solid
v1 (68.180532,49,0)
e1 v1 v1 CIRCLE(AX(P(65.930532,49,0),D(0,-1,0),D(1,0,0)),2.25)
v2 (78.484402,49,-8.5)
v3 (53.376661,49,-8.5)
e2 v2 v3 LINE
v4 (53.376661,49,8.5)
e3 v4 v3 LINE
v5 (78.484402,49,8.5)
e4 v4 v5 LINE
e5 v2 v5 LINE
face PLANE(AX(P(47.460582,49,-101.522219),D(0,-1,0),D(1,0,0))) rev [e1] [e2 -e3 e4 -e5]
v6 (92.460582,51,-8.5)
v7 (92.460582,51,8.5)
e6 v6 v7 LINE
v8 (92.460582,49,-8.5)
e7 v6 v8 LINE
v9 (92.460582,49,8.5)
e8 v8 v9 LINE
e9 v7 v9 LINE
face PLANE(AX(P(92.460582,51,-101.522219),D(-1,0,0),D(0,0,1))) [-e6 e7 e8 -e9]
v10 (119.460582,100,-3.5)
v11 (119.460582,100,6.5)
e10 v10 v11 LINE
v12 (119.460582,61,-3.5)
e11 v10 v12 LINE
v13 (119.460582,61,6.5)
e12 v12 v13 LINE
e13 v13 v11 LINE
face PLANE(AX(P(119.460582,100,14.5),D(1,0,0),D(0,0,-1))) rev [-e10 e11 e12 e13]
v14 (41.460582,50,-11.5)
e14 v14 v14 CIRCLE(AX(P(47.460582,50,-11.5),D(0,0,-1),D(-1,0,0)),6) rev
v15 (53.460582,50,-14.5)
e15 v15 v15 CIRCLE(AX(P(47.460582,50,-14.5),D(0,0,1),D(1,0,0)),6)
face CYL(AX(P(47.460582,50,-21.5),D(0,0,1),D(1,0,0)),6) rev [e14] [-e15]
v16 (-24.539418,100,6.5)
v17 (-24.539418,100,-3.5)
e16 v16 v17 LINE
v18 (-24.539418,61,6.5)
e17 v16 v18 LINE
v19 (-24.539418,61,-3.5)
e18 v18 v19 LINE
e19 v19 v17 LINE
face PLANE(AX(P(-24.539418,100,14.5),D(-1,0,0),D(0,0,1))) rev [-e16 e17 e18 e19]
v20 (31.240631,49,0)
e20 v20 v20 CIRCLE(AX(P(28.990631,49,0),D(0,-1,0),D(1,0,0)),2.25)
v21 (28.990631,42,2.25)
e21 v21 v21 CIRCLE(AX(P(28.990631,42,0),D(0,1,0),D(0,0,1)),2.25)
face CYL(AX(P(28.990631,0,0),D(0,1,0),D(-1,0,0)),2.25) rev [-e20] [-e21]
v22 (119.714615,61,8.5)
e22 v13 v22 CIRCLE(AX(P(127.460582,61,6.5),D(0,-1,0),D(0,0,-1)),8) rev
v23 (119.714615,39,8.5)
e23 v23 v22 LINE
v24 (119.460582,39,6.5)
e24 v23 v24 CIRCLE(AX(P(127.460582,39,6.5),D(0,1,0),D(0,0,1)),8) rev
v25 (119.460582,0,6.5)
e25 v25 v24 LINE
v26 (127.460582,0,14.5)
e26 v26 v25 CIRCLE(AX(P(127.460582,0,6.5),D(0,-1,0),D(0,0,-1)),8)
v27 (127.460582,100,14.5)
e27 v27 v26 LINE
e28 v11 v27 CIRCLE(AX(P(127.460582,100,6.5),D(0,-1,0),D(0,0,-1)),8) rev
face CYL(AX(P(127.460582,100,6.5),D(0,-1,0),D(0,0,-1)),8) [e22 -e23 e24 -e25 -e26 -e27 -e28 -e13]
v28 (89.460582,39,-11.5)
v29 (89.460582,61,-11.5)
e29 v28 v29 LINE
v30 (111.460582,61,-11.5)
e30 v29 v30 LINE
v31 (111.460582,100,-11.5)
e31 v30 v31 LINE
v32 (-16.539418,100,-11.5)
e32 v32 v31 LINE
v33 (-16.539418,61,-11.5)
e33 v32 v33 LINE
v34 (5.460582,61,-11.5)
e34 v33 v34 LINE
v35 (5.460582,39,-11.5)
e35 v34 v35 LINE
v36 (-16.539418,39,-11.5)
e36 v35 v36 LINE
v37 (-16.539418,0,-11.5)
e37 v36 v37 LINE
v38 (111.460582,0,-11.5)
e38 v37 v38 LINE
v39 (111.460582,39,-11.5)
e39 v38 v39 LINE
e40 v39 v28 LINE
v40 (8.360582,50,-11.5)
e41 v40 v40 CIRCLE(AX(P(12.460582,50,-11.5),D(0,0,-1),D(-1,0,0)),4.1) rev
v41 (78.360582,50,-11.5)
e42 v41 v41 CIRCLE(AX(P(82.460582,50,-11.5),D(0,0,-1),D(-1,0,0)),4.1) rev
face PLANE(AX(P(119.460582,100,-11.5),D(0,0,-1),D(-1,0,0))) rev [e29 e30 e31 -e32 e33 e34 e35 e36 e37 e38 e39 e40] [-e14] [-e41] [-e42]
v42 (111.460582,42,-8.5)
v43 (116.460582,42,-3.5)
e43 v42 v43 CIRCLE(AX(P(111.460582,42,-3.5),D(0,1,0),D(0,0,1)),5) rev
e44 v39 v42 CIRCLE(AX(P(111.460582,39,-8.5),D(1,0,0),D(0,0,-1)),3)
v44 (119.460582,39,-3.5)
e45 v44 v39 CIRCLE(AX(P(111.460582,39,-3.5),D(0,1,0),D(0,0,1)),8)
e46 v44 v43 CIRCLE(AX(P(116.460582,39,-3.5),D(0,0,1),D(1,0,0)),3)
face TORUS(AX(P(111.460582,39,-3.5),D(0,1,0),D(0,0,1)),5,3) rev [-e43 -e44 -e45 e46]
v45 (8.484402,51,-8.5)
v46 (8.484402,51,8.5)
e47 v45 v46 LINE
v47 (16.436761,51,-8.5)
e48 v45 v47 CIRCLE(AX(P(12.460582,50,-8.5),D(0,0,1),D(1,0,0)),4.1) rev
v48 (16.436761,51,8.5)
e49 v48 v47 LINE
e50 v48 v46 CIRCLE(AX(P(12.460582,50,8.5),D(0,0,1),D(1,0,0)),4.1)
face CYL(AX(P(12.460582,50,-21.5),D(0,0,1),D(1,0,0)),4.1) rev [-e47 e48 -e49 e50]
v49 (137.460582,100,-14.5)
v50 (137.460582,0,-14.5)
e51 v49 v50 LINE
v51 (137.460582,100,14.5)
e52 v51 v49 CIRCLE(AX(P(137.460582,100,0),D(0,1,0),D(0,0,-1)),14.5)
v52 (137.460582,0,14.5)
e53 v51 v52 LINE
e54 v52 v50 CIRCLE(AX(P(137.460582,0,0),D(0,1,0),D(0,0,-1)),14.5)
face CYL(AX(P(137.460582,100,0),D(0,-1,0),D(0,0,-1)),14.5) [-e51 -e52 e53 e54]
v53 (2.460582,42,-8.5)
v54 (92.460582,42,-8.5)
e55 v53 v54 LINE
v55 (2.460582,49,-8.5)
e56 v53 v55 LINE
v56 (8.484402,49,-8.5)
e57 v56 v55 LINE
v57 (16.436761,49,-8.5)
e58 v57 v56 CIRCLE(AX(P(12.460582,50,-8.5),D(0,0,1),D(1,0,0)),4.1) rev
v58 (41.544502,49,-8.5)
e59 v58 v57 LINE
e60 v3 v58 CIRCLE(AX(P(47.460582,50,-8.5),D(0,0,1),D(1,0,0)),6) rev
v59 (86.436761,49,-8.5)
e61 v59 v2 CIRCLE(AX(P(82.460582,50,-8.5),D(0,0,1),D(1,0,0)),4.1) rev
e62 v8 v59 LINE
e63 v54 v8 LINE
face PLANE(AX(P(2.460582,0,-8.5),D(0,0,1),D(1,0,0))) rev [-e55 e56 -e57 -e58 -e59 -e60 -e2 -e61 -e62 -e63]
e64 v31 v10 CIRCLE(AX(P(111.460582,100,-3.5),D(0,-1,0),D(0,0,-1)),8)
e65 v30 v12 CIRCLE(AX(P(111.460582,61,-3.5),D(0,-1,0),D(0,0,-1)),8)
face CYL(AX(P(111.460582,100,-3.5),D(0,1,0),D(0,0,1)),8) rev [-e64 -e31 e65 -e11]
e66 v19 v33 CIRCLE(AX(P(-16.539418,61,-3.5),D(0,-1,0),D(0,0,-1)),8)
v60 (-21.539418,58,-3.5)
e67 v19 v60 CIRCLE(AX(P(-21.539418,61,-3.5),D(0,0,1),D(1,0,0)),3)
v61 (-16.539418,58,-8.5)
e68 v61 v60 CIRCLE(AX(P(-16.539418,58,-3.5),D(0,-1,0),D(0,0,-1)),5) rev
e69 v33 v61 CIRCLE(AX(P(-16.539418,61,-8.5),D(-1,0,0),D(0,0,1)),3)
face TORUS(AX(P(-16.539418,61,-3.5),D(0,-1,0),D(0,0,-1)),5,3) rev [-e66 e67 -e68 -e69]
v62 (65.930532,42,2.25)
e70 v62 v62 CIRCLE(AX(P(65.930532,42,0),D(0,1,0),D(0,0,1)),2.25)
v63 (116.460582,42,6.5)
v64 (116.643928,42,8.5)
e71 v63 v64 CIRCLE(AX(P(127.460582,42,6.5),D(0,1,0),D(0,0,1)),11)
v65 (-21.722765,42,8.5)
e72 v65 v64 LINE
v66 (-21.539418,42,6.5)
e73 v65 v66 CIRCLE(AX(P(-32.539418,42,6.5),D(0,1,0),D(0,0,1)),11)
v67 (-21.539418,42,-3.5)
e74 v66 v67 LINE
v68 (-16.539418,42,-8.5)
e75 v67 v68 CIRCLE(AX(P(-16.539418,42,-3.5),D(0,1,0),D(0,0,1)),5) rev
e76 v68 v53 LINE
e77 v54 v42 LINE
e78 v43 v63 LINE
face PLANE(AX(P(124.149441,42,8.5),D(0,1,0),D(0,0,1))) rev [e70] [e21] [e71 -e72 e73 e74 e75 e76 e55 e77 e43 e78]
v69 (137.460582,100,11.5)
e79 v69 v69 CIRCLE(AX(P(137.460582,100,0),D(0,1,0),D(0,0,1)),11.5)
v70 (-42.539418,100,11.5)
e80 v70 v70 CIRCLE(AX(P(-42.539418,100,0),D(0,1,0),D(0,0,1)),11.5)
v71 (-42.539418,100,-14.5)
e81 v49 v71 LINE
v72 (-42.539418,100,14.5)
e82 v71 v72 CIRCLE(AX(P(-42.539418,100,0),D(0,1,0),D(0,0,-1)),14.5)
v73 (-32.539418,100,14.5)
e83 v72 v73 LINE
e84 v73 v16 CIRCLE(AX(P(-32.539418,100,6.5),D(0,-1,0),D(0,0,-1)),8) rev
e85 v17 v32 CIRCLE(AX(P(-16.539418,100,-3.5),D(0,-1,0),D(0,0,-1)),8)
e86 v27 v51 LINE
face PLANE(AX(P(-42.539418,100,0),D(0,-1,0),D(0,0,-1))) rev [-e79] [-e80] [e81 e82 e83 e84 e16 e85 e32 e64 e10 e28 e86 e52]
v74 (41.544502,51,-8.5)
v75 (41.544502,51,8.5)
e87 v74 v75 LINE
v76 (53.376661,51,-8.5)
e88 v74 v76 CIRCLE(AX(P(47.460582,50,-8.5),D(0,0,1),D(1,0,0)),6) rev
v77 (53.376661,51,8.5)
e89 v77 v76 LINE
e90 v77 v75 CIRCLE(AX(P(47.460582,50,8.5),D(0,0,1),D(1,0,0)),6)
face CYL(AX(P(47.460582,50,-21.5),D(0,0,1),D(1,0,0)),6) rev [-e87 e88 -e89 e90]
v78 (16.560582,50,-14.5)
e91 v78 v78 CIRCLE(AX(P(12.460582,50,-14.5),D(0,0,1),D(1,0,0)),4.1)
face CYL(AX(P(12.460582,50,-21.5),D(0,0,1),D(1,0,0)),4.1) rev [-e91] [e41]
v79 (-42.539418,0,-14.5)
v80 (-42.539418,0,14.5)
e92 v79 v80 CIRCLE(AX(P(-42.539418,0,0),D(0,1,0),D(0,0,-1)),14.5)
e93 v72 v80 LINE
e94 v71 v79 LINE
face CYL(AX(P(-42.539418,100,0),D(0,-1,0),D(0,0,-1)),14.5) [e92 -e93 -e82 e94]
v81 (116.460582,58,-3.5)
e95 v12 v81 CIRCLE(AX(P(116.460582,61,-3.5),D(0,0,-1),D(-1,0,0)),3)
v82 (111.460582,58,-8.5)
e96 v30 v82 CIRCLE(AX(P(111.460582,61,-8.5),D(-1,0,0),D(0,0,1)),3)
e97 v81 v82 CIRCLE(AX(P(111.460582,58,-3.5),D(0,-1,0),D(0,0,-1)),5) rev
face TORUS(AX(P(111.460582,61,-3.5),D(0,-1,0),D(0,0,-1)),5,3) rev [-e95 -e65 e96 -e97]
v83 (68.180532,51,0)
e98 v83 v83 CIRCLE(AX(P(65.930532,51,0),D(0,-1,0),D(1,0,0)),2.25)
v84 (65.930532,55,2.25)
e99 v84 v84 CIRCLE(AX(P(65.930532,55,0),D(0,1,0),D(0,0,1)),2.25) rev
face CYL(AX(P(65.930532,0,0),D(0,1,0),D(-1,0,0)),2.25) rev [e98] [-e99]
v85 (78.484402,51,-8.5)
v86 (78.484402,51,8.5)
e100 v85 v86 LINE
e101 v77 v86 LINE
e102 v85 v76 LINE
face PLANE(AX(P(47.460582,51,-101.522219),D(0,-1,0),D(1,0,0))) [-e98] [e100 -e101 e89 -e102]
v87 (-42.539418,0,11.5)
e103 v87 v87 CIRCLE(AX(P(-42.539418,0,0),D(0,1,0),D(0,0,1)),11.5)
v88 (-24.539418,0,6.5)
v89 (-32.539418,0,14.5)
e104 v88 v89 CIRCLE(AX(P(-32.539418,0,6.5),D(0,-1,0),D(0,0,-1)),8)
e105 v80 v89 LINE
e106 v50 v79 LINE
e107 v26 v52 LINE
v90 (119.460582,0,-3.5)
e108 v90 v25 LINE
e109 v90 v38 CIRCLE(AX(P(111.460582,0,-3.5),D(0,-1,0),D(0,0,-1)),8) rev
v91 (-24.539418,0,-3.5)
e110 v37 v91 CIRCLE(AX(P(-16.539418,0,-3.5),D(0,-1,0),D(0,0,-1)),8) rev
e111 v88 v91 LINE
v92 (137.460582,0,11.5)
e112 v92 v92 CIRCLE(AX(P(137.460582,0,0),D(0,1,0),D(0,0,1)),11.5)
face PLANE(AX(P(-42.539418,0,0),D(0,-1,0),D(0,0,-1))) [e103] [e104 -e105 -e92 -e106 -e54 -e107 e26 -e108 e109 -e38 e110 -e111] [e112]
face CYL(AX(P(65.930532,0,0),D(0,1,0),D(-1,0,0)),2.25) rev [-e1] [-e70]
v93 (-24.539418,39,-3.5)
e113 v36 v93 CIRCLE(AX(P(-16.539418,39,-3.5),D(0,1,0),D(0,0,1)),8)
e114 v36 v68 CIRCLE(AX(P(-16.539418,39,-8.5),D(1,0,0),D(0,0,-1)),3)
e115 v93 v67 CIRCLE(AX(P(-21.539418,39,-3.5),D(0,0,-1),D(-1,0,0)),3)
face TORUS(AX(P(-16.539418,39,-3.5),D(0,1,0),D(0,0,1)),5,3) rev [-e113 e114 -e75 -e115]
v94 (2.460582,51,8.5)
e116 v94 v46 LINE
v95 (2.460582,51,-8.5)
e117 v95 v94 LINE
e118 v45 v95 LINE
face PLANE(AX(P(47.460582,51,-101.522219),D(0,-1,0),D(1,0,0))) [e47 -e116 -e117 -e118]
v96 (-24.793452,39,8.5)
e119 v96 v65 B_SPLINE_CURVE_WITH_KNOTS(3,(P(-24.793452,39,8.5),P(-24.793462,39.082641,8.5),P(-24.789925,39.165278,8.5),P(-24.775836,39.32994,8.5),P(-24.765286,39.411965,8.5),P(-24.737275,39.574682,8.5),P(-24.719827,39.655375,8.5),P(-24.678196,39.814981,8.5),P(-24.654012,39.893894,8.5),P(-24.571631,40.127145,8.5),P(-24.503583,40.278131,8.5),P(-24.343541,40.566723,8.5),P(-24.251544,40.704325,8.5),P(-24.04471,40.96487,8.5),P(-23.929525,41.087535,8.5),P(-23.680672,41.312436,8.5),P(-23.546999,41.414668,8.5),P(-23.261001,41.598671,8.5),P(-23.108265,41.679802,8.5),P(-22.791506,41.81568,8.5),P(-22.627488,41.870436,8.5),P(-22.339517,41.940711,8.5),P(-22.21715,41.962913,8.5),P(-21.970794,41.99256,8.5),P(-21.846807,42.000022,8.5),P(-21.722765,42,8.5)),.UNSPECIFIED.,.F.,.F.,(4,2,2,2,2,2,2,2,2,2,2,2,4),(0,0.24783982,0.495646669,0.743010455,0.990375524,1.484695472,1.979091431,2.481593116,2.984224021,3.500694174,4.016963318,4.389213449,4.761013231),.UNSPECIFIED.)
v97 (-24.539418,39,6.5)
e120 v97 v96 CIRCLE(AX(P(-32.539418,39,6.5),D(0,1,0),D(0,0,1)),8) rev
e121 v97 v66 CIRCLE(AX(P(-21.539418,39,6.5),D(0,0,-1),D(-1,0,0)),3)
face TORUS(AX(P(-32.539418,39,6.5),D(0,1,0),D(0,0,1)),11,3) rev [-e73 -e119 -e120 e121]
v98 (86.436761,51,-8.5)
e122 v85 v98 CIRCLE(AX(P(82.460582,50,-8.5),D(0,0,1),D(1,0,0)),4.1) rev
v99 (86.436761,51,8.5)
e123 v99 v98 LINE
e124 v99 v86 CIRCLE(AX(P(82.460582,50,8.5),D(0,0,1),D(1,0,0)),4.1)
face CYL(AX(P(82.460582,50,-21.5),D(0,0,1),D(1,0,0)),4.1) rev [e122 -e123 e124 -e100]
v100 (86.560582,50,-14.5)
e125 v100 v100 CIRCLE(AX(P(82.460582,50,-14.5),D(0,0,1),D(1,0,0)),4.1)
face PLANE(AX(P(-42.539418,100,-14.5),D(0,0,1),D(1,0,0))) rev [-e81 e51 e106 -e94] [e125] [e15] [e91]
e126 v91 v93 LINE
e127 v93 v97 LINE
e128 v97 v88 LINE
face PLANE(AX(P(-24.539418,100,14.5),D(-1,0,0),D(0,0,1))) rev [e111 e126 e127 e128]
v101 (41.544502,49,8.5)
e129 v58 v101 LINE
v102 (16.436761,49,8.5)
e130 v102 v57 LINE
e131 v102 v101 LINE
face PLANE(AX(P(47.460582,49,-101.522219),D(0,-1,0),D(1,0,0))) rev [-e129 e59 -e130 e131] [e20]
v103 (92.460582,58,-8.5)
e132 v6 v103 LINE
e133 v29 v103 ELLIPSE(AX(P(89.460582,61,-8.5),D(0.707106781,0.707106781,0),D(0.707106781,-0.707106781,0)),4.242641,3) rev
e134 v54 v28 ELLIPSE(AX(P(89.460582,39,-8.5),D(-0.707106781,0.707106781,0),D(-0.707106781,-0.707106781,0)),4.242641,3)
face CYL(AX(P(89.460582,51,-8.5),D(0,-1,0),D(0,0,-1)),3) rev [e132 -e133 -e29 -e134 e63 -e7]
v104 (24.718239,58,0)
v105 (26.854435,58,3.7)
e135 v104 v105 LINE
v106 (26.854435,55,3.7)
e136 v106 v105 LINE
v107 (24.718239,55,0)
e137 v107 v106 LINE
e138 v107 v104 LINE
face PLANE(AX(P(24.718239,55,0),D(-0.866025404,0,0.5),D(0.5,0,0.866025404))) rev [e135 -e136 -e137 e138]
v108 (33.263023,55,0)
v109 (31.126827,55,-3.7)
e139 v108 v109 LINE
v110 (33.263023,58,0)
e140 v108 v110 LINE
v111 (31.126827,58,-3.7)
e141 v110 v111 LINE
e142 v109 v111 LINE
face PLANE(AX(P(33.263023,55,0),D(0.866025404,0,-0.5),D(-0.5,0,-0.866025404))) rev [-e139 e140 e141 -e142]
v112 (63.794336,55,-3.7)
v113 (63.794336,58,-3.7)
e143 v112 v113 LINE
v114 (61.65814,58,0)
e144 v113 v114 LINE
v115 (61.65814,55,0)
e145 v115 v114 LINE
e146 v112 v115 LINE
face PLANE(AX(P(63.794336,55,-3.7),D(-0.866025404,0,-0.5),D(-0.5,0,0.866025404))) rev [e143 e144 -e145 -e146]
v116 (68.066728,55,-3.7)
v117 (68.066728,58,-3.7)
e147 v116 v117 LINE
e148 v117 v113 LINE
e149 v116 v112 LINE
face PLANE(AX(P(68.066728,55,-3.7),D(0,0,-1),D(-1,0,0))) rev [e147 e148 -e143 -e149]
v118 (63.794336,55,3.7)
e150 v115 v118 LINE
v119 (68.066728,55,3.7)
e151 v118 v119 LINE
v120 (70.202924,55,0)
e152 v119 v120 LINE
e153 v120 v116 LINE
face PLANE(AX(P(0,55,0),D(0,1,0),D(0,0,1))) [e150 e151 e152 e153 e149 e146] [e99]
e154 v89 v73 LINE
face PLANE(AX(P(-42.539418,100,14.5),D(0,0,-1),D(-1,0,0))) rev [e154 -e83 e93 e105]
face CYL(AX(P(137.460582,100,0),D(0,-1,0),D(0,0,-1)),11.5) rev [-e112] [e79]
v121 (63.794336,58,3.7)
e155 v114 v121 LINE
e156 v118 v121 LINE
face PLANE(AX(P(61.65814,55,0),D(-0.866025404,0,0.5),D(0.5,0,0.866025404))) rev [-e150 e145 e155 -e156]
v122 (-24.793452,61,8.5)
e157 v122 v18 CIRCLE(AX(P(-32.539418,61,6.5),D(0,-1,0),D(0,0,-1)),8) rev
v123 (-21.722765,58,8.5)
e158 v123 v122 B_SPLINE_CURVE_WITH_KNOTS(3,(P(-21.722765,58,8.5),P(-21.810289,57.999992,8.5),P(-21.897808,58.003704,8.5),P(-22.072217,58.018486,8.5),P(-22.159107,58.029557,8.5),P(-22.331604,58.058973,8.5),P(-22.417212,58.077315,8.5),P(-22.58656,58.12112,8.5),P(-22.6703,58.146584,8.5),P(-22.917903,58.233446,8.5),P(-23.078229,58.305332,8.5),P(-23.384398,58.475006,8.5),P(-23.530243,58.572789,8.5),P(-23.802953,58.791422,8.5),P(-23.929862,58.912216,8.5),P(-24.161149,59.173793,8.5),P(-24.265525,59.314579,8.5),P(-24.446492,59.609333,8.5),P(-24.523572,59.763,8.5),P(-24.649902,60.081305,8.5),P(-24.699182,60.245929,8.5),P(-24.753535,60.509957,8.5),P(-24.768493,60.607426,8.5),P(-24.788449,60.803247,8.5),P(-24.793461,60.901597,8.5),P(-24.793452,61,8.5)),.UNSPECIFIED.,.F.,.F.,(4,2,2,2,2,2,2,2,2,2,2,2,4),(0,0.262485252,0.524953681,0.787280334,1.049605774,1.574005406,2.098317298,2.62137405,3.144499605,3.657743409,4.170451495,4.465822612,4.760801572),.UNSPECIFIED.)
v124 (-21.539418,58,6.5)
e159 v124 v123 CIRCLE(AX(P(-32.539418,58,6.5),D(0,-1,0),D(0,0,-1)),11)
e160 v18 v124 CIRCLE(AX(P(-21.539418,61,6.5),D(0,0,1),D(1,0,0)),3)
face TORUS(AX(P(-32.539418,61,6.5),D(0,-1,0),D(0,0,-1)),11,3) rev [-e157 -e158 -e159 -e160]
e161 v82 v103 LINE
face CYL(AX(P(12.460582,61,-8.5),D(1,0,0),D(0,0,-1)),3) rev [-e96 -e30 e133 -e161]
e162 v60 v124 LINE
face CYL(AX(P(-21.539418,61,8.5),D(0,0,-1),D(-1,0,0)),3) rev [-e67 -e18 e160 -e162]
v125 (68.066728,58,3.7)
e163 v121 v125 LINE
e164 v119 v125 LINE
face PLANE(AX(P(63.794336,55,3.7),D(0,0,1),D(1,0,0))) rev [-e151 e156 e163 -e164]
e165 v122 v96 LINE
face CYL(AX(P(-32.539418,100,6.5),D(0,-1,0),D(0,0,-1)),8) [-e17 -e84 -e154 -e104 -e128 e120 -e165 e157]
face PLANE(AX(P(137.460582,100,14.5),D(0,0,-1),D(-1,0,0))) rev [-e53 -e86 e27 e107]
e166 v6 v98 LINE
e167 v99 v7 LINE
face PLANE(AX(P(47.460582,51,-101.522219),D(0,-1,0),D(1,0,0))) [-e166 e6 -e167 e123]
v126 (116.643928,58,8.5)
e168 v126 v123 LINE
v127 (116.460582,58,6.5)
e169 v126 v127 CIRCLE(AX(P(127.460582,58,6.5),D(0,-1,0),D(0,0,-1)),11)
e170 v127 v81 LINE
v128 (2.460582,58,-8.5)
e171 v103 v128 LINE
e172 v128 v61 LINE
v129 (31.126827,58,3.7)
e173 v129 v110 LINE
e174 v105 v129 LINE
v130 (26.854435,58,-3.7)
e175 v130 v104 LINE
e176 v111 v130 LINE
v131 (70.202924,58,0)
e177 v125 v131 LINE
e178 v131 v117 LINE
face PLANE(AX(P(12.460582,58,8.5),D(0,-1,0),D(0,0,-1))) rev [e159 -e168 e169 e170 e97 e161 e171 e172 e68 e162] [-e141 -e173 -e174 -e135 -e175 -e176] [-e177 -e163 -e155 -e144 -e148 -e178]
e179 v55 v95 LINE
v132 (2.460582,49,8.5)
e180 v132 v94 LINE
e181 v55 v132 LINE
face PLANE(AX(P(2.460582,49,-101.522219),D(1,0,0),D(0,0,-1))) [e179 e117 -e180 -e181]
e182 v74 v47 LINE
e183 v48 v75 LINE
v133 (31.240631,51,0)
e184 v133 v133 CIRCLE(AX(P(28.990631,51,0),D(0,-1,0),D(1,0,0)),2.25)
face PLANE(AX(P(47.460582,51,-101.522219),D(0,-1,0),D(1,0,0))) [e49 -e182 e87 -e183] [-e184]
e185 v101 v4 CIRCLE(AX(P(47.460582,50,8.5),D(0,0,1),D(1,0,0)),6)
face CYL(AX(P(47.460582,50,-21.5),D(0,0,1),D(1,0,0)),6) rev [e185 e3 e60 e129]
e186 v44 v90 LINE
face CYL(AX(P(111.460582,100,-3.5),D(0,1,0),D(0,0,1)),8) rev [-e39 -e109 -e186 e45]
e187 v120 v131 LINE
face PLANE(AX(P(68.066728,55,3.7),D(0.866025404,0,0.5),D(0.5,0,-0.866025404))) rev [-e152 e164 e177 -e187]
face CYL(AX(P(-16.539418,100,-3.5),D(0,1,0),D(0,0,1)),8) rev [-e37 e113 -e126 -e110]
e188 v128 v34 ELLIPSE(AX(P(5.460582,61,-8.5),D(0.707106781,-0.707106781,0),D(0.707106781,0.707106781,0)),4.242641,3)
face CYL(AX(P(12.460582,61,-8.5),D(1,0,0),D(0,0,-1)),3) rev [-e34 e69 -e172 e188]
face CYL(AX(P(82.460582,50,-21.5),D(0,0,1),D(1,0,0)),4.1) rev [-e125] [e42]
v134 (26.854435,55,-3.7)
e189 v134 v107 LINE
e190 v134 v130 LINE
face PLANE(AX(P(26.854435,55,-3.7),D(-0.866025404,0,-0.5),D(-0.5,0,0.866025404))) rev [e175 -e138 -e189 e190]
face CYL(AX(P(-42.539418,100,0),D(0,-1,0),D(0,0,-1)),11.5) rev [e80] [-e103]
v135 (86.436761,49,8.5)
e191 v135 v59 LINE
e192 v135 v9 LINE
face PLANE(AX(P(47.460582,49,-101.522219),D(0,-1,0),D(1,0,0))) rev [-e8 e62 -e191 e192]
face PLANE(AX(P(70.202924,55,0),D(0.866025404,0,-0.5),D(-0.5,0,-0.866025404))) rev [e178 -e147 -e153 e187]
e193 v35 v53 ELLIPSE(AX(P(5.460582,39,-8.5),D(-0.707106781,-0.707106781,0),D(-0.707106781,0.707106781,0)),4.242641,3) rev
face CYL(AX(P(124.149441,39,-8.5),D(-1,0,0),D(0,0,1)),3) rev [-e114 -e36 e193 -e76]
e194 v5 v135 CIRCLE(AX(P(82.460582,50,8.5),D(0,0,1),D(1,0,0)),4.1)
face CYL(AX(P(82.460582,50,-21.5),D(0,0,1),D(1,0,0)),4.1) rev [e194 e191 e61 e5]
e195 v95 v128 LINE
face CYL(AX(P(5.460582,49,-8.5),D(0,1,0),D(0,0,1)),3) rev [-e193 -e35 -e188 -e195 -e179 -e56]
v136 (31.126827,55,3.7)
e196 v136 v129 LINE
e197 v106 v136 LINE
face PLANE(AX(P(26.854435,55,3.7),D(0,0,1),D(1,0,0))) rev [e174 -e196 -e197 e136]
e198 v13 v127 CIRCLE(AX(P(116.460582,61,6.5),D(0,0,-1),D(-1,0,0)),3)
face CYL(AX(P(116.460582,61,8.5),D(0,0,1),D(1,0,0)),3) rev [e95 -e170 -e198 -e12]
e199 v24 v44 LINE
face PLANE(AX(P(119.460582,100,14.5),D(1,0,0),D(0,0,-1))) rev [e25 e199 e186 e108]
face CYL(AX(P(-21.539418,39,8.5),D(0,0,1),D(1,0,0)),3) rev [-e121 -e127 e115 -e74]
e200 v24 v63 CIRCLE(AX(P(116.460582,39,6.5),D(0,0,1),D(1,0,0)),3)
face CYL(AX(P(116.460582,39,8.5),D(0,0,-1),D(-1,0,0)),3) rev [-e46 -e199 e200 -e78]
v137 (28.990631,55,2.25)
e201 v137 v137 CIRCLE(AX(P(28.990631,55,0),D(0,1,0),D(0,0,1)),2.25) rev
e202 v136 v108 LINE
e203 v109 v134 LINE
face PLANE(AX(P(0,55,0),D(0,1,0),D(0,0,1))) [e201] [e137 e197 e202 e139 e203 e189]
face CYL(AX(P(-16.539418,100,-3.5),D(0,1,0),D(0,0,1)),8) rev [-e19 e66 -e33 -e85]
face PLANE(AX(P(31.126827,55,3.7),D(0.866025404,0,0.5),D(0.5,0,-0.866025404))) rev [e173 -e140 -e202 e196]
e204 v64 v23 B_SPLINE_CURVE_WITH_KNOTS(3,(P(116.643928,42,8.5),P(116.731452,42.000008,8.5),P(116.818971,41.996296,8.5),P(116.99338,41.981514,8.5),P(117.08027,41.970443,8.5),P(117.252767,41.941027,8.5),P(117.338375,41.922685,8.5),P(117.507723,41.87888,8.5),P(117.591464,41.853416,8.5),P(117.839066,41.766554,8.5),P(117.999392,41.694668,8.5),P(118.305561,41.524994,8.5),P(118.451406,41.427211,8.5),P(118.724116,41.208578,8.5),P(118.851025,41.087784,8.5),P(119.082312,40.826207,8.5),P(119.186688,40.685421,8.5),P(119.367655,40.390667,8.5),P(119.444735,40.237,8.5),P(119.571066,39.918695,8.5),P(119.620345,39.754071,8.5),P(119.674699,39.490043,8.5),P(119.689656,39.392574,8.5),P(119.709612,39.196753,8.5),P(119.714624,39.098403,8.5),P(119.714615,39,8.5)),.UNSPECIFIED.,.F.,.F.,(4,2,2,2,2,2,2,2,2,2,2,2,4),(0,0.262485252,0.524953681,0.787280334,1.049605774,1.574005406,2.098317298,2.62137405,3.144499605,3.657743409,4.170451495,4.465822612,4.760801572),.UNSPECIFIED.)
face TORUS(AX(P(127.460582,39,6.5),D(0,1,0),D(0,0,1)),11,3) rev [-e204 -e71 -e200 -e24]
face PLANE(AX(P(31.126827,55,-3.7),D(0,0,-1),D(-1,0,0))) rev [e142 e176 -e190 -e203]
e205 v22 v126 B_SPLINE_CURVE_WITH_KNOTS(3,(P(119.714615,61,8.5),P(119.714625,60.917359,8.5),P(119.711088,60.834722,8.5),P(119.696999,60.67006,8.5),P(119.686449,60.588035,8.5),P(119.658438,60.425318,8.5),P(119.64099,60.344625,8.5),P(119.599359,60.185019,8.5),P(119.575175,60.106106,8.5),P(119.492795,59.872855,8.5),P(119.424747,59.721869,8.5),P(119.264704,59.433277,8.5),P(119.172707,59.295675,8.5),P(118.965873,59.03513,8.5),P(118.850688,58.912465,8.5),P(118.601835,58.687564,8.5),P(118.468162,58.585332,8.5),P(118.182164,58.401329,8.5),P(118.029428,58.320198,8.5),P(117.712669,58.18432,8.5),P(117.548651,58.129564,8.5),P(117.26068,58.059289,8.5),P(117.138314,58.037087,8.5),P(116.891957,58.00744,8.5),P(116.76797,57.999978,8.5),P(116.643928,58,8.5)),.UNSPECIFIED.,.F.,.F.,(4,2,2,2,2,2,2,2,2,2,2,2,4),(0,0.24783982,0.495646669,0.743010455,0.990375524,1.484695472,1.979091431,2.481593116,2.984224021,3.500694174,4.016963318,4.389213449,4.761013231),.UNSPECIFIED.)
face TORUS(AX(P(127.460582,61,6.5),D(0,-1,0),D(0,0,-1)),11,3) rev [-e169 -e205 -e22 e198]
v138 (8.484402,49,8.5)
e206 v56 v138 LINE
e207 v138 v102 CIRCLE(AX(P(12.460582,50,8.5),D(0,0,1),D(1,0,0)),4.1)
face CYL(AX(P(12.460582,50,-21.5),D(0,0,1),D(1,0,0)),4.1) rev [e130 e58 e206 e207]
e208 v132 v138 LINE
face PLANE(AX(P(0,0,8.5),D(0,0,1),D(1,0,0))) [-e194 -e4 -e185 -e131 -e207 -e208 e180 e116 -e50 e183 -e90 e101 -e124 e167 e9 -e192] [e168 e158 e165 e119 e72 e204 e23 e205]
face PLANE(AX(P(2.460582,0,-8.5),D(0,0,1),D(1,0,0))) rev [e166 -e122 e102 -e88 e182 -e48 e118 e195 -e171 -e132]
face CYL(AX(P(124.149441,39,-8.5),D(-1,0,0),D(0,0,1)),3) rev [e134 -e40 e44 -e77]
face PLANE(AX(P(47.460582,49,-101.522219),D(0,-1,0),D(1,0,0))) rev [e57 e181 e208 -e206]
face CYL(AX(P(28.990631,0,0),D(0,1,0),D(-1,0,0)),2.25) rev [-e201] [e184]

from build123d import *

# Parameters (mm, degrees)
SKETCH1_R                    = 11.5
BOSS_EXTRUDE1_DEPTH          = 100
FILLET1_R                    = 8
SKETCH2_R                    = 4.1
SKETCH2_R_2                  = 6
CUT_EXTRUDE1_DEPTH           = 10
BOSS_EXTRUDE2_START          = 20
SKETCH3_R                    = 4.1
SKETCH3_R_2                  = 6
BOSS_EXTRUDE2_DEPTH          = 20
FILLET2_R                    = 3
CUT_EXTRUDE_THIN1_DEPTH      = 184.360351078
CUT_EXTRUDE_THIN1_DEPTH_BACK = 20
CUT_EXTRUDE_THIN2_DEPTH      = 164.298096582
CUT_EXTRUDE_THIN2_DEPTH_BACK = 20
FILLET3_R                    = 3
CUT_EXTRUDE2_DEPTH           = 161.944923335
CUT_EXTRUDE2_DEPTH_BACK      = 161.944923335
SKETCH6_R                    = 2.25
CUT_EXTRUDE3_DEPTH           = 3


with BuildPart() as part:
    # Sketch1 → Boss-Extrude1 (new body)
    with BuildSketch(Plane(origin=(0, 0, 0), x_dir=(1, 0, 0), z_dir=(0, 1, 0))):
        with BuildLine():
            Line((137.460581558, -14.5), (119.460581558, -14.5))
            Line((119.460581558, -14.5), (119.460581558, 11.5))
            Line((119.460581558, 11.5), (-24.539418442, 11.5))
            Line((-24.539418442, 11.5), (-24.539418442, -14.5))
            Line((-24.539418442, -14.5), (-42.539418442, -14.5))
            ThreePointArc((-42.539418442, -14.5), (-57.039418442, 0), (-42.539418442, 14.5))
            Line((-42.539418442, 14.5), (137.460581558, 14.5))
            ThreePointArc((137.460581558, 14.5), (151.960581558, 0), (137.460581558, -14.5))
        make_face()
        with Locations(Location((-42.539418442, 0, 0), (0, 0, 270))):
            Circle(SKETCH1_R, mode=Mode.SUBTRACT)
        with Locations(Location((137.460581558, 0, 0), (0, 0, 270))):
            Circle(SKETCH1_R, mode=Mode.SUBTRACT)
    extrude(amount=BOSS_EXTRUDE1_DEPTH)

    # Fillet1
    fillet1_edges = [part.edges().sort_by_distance(p)[0] for p in [
        (119.460581558, 50, 14.5),
        (119.460581558, 50, -11.5),
        (-24.539418442, 50, -11.5),
        (-24.539418442, 50, 14.5),
    ]]
    fillet(fillet1_edges, radius=FILLET1_R)

    # Sketch2 → Cut-Extrude1 (cut)
    with BuildSketch(Plane.XY.offset(-11.5)):
        with Locations((12.460581558, 50)):
            Circle(SKETCH2_R)
        with Locations((82.460581558, 50)):
            Circle(SKETCH2_R)
        with Locations((47.460581558, 50)):
            Circle(SKETCH2_R_2)
    extrude(amount=-CUT_EXTRUDE1_DEPTH, mode=Mode.SUBTRACT)

    # Sketch3 → Boss-Extrude2 (add)
    with BuildSketch(Plane.XY.offset(-11.5).offset(BOSS_EXTRUDE2_START)):
        Polygon((12.460581558, 58), (82.460581558, 58), (124.149440998, 58), (124.149440998, 42), (82.460581558, 42), (12.460581558, 42), (-28.8662965, 42), (-28.8662965, 58), (-16.539418442, 58), align=None)
        with Locations((12.460581558, 50)):
            Circle(SKETCH3_R, mode=Mode.SUBTRACT)
        with Locations((82.460581558, 50)):
            Circle(SKETCH3_R, mode=Mode.SUBTRACT)
        with Locations((47.460581558, 50)):
            Circle(SKETCH3_R_2, mode=Mode.SUBTRACT)
    extrude(amount=-BOSS_EXTRUDE2_DEPTH)

    # Fillet2
    fillet2_edges = [part.edges().sort_by_distance(p)[0] for p in [
        (-24.603180872, 58, 7.50803434),
        (-24.603180872, 42, 7.50803434),
        (47.460581558, 42, -11.5),
        (117.117435807, 42, -9.156854249),
        (119.460581558, 42, 1.5),
        (-24.539418442, 42, 1.5),
        (-22.196272692, 42, -9.156854249),
        (119.524343988, 42, 7.50803434),
        (119.460581558, 58, 1.5),
        (117.117435807, 58, -9.156854249),
        (47.460581558, 58, -11.5),
        (-22.196272692, 58, -9.156854249),
        (-24.539418442, 58, 1.5),
        (119.524343988, 58, 7.50803434),
    ]]
    fillet(fillet2_edges, radius=FILLET2_R)

    # Sketch4 → Cut-Extrude-Thin1 (cut, two sides: drawn at the far end of the back side and taken through both)
    with BuildSketch(Plane.XY.offset(8.5).offset(-CUT_EXTRUDE_THIN1_DEPTH_BACK)):
        Polygon((92.460581558, 51), (47.460581558, 51), (2.460581558, 51), (2.460581558, 49), (47.460581558, 49), (92.460581558, 49), align=None)
    extrude(amount=CUT_EXTRUDE_THIN1_DEPTH + CUT_EXTRUDE_THIN1_DEPTH_BACK, mode=Mode.SUBTRACT)

    # Sketch5 → Cut-Extrude-Thin2 (cut, two sides: drawn at the far end of the back side and taken through both)
    with BuildSketch(Plane(origin=(0, 42, 0), x_dir=(-1, 0, 0), z_dir=(0, -1, 0)).offset(-CUT_EXTRUDE_THIN2_DEPTH_BACK)):
        Polygon((-2.460581558, 8.5), (-47.460581558, 8.5), (-92.460581558, 8.5), (-92.460581558, 11.5), (-47.460581558, 11.5), (-2.460581558, 11.5), align=None)
    extrude(amount=CUT_EXTRUDE_THIN2_DEPTH + CUT_EXTRUDE_THIN2_DEPTH_BACK, mode=Mode.SUBTRACT)

    # Fillet3
    fillet3_edges = [part.edges().sort_by_distance(p)[0] for p in [
        (2.460581558, 50, -11.5),
        (92.460581558, 50, -11.5),
    ]]
    fillet(fillet3_edges, radius=FILLET3_R - 0.0001)  # a hair under: the kernel refuses the full size

    # Sketch6 → Cut-Extrude2 (cut, two sides: drawn at the far end of the back side and taken through both)
    with BuildSketch(Plane(origin=(0, 49, 0), x_dir=(1, 0, 0), z_dir=(0, 1, 0)).offset(-CUT_EXTRUDE2_DEPTH_BACK)):
        with Locations(Location((28.990631201, 0, 0), (0, 0, 270))):
            Circle(SKETCH6_R)
        with Locations(Location((65.930531914, 0, 0), (0, 0, 270))):
            Circle(SKETCH6_R)
    extrude(amount=CUT_EXTRUDE2_DEPTH + CUT_EXTRUDE2_DEPTH_BACK, mode=Mode.SUBTRACT)

    # Sketch7 → Cut-Extrude3 (cut)
    with BuildSketch(Plane(origin=(0, 58, 0), x_dir=(1, 0, 0), z_dir=(0, 1, 0))):
        Polygon((33.263023193, 0), (31.126827197, 3.7), (26.854435205, 3.7), (24.718239209, 0), (26.854435205, -3.7), (31.126827197, -3.7), align=None)
        Polygon((70.202923906, 0), (68.06672791, 3.7), (63.794335918, 3.7), (61.658139922, 0), (63.794335918, -3.7), (68.06672791, -3.7), align=None)
    extrude(amount=-CUT_EXTRUDE3_DEPTH, mode=Mode.SUBTRACT)


solid = part.part
